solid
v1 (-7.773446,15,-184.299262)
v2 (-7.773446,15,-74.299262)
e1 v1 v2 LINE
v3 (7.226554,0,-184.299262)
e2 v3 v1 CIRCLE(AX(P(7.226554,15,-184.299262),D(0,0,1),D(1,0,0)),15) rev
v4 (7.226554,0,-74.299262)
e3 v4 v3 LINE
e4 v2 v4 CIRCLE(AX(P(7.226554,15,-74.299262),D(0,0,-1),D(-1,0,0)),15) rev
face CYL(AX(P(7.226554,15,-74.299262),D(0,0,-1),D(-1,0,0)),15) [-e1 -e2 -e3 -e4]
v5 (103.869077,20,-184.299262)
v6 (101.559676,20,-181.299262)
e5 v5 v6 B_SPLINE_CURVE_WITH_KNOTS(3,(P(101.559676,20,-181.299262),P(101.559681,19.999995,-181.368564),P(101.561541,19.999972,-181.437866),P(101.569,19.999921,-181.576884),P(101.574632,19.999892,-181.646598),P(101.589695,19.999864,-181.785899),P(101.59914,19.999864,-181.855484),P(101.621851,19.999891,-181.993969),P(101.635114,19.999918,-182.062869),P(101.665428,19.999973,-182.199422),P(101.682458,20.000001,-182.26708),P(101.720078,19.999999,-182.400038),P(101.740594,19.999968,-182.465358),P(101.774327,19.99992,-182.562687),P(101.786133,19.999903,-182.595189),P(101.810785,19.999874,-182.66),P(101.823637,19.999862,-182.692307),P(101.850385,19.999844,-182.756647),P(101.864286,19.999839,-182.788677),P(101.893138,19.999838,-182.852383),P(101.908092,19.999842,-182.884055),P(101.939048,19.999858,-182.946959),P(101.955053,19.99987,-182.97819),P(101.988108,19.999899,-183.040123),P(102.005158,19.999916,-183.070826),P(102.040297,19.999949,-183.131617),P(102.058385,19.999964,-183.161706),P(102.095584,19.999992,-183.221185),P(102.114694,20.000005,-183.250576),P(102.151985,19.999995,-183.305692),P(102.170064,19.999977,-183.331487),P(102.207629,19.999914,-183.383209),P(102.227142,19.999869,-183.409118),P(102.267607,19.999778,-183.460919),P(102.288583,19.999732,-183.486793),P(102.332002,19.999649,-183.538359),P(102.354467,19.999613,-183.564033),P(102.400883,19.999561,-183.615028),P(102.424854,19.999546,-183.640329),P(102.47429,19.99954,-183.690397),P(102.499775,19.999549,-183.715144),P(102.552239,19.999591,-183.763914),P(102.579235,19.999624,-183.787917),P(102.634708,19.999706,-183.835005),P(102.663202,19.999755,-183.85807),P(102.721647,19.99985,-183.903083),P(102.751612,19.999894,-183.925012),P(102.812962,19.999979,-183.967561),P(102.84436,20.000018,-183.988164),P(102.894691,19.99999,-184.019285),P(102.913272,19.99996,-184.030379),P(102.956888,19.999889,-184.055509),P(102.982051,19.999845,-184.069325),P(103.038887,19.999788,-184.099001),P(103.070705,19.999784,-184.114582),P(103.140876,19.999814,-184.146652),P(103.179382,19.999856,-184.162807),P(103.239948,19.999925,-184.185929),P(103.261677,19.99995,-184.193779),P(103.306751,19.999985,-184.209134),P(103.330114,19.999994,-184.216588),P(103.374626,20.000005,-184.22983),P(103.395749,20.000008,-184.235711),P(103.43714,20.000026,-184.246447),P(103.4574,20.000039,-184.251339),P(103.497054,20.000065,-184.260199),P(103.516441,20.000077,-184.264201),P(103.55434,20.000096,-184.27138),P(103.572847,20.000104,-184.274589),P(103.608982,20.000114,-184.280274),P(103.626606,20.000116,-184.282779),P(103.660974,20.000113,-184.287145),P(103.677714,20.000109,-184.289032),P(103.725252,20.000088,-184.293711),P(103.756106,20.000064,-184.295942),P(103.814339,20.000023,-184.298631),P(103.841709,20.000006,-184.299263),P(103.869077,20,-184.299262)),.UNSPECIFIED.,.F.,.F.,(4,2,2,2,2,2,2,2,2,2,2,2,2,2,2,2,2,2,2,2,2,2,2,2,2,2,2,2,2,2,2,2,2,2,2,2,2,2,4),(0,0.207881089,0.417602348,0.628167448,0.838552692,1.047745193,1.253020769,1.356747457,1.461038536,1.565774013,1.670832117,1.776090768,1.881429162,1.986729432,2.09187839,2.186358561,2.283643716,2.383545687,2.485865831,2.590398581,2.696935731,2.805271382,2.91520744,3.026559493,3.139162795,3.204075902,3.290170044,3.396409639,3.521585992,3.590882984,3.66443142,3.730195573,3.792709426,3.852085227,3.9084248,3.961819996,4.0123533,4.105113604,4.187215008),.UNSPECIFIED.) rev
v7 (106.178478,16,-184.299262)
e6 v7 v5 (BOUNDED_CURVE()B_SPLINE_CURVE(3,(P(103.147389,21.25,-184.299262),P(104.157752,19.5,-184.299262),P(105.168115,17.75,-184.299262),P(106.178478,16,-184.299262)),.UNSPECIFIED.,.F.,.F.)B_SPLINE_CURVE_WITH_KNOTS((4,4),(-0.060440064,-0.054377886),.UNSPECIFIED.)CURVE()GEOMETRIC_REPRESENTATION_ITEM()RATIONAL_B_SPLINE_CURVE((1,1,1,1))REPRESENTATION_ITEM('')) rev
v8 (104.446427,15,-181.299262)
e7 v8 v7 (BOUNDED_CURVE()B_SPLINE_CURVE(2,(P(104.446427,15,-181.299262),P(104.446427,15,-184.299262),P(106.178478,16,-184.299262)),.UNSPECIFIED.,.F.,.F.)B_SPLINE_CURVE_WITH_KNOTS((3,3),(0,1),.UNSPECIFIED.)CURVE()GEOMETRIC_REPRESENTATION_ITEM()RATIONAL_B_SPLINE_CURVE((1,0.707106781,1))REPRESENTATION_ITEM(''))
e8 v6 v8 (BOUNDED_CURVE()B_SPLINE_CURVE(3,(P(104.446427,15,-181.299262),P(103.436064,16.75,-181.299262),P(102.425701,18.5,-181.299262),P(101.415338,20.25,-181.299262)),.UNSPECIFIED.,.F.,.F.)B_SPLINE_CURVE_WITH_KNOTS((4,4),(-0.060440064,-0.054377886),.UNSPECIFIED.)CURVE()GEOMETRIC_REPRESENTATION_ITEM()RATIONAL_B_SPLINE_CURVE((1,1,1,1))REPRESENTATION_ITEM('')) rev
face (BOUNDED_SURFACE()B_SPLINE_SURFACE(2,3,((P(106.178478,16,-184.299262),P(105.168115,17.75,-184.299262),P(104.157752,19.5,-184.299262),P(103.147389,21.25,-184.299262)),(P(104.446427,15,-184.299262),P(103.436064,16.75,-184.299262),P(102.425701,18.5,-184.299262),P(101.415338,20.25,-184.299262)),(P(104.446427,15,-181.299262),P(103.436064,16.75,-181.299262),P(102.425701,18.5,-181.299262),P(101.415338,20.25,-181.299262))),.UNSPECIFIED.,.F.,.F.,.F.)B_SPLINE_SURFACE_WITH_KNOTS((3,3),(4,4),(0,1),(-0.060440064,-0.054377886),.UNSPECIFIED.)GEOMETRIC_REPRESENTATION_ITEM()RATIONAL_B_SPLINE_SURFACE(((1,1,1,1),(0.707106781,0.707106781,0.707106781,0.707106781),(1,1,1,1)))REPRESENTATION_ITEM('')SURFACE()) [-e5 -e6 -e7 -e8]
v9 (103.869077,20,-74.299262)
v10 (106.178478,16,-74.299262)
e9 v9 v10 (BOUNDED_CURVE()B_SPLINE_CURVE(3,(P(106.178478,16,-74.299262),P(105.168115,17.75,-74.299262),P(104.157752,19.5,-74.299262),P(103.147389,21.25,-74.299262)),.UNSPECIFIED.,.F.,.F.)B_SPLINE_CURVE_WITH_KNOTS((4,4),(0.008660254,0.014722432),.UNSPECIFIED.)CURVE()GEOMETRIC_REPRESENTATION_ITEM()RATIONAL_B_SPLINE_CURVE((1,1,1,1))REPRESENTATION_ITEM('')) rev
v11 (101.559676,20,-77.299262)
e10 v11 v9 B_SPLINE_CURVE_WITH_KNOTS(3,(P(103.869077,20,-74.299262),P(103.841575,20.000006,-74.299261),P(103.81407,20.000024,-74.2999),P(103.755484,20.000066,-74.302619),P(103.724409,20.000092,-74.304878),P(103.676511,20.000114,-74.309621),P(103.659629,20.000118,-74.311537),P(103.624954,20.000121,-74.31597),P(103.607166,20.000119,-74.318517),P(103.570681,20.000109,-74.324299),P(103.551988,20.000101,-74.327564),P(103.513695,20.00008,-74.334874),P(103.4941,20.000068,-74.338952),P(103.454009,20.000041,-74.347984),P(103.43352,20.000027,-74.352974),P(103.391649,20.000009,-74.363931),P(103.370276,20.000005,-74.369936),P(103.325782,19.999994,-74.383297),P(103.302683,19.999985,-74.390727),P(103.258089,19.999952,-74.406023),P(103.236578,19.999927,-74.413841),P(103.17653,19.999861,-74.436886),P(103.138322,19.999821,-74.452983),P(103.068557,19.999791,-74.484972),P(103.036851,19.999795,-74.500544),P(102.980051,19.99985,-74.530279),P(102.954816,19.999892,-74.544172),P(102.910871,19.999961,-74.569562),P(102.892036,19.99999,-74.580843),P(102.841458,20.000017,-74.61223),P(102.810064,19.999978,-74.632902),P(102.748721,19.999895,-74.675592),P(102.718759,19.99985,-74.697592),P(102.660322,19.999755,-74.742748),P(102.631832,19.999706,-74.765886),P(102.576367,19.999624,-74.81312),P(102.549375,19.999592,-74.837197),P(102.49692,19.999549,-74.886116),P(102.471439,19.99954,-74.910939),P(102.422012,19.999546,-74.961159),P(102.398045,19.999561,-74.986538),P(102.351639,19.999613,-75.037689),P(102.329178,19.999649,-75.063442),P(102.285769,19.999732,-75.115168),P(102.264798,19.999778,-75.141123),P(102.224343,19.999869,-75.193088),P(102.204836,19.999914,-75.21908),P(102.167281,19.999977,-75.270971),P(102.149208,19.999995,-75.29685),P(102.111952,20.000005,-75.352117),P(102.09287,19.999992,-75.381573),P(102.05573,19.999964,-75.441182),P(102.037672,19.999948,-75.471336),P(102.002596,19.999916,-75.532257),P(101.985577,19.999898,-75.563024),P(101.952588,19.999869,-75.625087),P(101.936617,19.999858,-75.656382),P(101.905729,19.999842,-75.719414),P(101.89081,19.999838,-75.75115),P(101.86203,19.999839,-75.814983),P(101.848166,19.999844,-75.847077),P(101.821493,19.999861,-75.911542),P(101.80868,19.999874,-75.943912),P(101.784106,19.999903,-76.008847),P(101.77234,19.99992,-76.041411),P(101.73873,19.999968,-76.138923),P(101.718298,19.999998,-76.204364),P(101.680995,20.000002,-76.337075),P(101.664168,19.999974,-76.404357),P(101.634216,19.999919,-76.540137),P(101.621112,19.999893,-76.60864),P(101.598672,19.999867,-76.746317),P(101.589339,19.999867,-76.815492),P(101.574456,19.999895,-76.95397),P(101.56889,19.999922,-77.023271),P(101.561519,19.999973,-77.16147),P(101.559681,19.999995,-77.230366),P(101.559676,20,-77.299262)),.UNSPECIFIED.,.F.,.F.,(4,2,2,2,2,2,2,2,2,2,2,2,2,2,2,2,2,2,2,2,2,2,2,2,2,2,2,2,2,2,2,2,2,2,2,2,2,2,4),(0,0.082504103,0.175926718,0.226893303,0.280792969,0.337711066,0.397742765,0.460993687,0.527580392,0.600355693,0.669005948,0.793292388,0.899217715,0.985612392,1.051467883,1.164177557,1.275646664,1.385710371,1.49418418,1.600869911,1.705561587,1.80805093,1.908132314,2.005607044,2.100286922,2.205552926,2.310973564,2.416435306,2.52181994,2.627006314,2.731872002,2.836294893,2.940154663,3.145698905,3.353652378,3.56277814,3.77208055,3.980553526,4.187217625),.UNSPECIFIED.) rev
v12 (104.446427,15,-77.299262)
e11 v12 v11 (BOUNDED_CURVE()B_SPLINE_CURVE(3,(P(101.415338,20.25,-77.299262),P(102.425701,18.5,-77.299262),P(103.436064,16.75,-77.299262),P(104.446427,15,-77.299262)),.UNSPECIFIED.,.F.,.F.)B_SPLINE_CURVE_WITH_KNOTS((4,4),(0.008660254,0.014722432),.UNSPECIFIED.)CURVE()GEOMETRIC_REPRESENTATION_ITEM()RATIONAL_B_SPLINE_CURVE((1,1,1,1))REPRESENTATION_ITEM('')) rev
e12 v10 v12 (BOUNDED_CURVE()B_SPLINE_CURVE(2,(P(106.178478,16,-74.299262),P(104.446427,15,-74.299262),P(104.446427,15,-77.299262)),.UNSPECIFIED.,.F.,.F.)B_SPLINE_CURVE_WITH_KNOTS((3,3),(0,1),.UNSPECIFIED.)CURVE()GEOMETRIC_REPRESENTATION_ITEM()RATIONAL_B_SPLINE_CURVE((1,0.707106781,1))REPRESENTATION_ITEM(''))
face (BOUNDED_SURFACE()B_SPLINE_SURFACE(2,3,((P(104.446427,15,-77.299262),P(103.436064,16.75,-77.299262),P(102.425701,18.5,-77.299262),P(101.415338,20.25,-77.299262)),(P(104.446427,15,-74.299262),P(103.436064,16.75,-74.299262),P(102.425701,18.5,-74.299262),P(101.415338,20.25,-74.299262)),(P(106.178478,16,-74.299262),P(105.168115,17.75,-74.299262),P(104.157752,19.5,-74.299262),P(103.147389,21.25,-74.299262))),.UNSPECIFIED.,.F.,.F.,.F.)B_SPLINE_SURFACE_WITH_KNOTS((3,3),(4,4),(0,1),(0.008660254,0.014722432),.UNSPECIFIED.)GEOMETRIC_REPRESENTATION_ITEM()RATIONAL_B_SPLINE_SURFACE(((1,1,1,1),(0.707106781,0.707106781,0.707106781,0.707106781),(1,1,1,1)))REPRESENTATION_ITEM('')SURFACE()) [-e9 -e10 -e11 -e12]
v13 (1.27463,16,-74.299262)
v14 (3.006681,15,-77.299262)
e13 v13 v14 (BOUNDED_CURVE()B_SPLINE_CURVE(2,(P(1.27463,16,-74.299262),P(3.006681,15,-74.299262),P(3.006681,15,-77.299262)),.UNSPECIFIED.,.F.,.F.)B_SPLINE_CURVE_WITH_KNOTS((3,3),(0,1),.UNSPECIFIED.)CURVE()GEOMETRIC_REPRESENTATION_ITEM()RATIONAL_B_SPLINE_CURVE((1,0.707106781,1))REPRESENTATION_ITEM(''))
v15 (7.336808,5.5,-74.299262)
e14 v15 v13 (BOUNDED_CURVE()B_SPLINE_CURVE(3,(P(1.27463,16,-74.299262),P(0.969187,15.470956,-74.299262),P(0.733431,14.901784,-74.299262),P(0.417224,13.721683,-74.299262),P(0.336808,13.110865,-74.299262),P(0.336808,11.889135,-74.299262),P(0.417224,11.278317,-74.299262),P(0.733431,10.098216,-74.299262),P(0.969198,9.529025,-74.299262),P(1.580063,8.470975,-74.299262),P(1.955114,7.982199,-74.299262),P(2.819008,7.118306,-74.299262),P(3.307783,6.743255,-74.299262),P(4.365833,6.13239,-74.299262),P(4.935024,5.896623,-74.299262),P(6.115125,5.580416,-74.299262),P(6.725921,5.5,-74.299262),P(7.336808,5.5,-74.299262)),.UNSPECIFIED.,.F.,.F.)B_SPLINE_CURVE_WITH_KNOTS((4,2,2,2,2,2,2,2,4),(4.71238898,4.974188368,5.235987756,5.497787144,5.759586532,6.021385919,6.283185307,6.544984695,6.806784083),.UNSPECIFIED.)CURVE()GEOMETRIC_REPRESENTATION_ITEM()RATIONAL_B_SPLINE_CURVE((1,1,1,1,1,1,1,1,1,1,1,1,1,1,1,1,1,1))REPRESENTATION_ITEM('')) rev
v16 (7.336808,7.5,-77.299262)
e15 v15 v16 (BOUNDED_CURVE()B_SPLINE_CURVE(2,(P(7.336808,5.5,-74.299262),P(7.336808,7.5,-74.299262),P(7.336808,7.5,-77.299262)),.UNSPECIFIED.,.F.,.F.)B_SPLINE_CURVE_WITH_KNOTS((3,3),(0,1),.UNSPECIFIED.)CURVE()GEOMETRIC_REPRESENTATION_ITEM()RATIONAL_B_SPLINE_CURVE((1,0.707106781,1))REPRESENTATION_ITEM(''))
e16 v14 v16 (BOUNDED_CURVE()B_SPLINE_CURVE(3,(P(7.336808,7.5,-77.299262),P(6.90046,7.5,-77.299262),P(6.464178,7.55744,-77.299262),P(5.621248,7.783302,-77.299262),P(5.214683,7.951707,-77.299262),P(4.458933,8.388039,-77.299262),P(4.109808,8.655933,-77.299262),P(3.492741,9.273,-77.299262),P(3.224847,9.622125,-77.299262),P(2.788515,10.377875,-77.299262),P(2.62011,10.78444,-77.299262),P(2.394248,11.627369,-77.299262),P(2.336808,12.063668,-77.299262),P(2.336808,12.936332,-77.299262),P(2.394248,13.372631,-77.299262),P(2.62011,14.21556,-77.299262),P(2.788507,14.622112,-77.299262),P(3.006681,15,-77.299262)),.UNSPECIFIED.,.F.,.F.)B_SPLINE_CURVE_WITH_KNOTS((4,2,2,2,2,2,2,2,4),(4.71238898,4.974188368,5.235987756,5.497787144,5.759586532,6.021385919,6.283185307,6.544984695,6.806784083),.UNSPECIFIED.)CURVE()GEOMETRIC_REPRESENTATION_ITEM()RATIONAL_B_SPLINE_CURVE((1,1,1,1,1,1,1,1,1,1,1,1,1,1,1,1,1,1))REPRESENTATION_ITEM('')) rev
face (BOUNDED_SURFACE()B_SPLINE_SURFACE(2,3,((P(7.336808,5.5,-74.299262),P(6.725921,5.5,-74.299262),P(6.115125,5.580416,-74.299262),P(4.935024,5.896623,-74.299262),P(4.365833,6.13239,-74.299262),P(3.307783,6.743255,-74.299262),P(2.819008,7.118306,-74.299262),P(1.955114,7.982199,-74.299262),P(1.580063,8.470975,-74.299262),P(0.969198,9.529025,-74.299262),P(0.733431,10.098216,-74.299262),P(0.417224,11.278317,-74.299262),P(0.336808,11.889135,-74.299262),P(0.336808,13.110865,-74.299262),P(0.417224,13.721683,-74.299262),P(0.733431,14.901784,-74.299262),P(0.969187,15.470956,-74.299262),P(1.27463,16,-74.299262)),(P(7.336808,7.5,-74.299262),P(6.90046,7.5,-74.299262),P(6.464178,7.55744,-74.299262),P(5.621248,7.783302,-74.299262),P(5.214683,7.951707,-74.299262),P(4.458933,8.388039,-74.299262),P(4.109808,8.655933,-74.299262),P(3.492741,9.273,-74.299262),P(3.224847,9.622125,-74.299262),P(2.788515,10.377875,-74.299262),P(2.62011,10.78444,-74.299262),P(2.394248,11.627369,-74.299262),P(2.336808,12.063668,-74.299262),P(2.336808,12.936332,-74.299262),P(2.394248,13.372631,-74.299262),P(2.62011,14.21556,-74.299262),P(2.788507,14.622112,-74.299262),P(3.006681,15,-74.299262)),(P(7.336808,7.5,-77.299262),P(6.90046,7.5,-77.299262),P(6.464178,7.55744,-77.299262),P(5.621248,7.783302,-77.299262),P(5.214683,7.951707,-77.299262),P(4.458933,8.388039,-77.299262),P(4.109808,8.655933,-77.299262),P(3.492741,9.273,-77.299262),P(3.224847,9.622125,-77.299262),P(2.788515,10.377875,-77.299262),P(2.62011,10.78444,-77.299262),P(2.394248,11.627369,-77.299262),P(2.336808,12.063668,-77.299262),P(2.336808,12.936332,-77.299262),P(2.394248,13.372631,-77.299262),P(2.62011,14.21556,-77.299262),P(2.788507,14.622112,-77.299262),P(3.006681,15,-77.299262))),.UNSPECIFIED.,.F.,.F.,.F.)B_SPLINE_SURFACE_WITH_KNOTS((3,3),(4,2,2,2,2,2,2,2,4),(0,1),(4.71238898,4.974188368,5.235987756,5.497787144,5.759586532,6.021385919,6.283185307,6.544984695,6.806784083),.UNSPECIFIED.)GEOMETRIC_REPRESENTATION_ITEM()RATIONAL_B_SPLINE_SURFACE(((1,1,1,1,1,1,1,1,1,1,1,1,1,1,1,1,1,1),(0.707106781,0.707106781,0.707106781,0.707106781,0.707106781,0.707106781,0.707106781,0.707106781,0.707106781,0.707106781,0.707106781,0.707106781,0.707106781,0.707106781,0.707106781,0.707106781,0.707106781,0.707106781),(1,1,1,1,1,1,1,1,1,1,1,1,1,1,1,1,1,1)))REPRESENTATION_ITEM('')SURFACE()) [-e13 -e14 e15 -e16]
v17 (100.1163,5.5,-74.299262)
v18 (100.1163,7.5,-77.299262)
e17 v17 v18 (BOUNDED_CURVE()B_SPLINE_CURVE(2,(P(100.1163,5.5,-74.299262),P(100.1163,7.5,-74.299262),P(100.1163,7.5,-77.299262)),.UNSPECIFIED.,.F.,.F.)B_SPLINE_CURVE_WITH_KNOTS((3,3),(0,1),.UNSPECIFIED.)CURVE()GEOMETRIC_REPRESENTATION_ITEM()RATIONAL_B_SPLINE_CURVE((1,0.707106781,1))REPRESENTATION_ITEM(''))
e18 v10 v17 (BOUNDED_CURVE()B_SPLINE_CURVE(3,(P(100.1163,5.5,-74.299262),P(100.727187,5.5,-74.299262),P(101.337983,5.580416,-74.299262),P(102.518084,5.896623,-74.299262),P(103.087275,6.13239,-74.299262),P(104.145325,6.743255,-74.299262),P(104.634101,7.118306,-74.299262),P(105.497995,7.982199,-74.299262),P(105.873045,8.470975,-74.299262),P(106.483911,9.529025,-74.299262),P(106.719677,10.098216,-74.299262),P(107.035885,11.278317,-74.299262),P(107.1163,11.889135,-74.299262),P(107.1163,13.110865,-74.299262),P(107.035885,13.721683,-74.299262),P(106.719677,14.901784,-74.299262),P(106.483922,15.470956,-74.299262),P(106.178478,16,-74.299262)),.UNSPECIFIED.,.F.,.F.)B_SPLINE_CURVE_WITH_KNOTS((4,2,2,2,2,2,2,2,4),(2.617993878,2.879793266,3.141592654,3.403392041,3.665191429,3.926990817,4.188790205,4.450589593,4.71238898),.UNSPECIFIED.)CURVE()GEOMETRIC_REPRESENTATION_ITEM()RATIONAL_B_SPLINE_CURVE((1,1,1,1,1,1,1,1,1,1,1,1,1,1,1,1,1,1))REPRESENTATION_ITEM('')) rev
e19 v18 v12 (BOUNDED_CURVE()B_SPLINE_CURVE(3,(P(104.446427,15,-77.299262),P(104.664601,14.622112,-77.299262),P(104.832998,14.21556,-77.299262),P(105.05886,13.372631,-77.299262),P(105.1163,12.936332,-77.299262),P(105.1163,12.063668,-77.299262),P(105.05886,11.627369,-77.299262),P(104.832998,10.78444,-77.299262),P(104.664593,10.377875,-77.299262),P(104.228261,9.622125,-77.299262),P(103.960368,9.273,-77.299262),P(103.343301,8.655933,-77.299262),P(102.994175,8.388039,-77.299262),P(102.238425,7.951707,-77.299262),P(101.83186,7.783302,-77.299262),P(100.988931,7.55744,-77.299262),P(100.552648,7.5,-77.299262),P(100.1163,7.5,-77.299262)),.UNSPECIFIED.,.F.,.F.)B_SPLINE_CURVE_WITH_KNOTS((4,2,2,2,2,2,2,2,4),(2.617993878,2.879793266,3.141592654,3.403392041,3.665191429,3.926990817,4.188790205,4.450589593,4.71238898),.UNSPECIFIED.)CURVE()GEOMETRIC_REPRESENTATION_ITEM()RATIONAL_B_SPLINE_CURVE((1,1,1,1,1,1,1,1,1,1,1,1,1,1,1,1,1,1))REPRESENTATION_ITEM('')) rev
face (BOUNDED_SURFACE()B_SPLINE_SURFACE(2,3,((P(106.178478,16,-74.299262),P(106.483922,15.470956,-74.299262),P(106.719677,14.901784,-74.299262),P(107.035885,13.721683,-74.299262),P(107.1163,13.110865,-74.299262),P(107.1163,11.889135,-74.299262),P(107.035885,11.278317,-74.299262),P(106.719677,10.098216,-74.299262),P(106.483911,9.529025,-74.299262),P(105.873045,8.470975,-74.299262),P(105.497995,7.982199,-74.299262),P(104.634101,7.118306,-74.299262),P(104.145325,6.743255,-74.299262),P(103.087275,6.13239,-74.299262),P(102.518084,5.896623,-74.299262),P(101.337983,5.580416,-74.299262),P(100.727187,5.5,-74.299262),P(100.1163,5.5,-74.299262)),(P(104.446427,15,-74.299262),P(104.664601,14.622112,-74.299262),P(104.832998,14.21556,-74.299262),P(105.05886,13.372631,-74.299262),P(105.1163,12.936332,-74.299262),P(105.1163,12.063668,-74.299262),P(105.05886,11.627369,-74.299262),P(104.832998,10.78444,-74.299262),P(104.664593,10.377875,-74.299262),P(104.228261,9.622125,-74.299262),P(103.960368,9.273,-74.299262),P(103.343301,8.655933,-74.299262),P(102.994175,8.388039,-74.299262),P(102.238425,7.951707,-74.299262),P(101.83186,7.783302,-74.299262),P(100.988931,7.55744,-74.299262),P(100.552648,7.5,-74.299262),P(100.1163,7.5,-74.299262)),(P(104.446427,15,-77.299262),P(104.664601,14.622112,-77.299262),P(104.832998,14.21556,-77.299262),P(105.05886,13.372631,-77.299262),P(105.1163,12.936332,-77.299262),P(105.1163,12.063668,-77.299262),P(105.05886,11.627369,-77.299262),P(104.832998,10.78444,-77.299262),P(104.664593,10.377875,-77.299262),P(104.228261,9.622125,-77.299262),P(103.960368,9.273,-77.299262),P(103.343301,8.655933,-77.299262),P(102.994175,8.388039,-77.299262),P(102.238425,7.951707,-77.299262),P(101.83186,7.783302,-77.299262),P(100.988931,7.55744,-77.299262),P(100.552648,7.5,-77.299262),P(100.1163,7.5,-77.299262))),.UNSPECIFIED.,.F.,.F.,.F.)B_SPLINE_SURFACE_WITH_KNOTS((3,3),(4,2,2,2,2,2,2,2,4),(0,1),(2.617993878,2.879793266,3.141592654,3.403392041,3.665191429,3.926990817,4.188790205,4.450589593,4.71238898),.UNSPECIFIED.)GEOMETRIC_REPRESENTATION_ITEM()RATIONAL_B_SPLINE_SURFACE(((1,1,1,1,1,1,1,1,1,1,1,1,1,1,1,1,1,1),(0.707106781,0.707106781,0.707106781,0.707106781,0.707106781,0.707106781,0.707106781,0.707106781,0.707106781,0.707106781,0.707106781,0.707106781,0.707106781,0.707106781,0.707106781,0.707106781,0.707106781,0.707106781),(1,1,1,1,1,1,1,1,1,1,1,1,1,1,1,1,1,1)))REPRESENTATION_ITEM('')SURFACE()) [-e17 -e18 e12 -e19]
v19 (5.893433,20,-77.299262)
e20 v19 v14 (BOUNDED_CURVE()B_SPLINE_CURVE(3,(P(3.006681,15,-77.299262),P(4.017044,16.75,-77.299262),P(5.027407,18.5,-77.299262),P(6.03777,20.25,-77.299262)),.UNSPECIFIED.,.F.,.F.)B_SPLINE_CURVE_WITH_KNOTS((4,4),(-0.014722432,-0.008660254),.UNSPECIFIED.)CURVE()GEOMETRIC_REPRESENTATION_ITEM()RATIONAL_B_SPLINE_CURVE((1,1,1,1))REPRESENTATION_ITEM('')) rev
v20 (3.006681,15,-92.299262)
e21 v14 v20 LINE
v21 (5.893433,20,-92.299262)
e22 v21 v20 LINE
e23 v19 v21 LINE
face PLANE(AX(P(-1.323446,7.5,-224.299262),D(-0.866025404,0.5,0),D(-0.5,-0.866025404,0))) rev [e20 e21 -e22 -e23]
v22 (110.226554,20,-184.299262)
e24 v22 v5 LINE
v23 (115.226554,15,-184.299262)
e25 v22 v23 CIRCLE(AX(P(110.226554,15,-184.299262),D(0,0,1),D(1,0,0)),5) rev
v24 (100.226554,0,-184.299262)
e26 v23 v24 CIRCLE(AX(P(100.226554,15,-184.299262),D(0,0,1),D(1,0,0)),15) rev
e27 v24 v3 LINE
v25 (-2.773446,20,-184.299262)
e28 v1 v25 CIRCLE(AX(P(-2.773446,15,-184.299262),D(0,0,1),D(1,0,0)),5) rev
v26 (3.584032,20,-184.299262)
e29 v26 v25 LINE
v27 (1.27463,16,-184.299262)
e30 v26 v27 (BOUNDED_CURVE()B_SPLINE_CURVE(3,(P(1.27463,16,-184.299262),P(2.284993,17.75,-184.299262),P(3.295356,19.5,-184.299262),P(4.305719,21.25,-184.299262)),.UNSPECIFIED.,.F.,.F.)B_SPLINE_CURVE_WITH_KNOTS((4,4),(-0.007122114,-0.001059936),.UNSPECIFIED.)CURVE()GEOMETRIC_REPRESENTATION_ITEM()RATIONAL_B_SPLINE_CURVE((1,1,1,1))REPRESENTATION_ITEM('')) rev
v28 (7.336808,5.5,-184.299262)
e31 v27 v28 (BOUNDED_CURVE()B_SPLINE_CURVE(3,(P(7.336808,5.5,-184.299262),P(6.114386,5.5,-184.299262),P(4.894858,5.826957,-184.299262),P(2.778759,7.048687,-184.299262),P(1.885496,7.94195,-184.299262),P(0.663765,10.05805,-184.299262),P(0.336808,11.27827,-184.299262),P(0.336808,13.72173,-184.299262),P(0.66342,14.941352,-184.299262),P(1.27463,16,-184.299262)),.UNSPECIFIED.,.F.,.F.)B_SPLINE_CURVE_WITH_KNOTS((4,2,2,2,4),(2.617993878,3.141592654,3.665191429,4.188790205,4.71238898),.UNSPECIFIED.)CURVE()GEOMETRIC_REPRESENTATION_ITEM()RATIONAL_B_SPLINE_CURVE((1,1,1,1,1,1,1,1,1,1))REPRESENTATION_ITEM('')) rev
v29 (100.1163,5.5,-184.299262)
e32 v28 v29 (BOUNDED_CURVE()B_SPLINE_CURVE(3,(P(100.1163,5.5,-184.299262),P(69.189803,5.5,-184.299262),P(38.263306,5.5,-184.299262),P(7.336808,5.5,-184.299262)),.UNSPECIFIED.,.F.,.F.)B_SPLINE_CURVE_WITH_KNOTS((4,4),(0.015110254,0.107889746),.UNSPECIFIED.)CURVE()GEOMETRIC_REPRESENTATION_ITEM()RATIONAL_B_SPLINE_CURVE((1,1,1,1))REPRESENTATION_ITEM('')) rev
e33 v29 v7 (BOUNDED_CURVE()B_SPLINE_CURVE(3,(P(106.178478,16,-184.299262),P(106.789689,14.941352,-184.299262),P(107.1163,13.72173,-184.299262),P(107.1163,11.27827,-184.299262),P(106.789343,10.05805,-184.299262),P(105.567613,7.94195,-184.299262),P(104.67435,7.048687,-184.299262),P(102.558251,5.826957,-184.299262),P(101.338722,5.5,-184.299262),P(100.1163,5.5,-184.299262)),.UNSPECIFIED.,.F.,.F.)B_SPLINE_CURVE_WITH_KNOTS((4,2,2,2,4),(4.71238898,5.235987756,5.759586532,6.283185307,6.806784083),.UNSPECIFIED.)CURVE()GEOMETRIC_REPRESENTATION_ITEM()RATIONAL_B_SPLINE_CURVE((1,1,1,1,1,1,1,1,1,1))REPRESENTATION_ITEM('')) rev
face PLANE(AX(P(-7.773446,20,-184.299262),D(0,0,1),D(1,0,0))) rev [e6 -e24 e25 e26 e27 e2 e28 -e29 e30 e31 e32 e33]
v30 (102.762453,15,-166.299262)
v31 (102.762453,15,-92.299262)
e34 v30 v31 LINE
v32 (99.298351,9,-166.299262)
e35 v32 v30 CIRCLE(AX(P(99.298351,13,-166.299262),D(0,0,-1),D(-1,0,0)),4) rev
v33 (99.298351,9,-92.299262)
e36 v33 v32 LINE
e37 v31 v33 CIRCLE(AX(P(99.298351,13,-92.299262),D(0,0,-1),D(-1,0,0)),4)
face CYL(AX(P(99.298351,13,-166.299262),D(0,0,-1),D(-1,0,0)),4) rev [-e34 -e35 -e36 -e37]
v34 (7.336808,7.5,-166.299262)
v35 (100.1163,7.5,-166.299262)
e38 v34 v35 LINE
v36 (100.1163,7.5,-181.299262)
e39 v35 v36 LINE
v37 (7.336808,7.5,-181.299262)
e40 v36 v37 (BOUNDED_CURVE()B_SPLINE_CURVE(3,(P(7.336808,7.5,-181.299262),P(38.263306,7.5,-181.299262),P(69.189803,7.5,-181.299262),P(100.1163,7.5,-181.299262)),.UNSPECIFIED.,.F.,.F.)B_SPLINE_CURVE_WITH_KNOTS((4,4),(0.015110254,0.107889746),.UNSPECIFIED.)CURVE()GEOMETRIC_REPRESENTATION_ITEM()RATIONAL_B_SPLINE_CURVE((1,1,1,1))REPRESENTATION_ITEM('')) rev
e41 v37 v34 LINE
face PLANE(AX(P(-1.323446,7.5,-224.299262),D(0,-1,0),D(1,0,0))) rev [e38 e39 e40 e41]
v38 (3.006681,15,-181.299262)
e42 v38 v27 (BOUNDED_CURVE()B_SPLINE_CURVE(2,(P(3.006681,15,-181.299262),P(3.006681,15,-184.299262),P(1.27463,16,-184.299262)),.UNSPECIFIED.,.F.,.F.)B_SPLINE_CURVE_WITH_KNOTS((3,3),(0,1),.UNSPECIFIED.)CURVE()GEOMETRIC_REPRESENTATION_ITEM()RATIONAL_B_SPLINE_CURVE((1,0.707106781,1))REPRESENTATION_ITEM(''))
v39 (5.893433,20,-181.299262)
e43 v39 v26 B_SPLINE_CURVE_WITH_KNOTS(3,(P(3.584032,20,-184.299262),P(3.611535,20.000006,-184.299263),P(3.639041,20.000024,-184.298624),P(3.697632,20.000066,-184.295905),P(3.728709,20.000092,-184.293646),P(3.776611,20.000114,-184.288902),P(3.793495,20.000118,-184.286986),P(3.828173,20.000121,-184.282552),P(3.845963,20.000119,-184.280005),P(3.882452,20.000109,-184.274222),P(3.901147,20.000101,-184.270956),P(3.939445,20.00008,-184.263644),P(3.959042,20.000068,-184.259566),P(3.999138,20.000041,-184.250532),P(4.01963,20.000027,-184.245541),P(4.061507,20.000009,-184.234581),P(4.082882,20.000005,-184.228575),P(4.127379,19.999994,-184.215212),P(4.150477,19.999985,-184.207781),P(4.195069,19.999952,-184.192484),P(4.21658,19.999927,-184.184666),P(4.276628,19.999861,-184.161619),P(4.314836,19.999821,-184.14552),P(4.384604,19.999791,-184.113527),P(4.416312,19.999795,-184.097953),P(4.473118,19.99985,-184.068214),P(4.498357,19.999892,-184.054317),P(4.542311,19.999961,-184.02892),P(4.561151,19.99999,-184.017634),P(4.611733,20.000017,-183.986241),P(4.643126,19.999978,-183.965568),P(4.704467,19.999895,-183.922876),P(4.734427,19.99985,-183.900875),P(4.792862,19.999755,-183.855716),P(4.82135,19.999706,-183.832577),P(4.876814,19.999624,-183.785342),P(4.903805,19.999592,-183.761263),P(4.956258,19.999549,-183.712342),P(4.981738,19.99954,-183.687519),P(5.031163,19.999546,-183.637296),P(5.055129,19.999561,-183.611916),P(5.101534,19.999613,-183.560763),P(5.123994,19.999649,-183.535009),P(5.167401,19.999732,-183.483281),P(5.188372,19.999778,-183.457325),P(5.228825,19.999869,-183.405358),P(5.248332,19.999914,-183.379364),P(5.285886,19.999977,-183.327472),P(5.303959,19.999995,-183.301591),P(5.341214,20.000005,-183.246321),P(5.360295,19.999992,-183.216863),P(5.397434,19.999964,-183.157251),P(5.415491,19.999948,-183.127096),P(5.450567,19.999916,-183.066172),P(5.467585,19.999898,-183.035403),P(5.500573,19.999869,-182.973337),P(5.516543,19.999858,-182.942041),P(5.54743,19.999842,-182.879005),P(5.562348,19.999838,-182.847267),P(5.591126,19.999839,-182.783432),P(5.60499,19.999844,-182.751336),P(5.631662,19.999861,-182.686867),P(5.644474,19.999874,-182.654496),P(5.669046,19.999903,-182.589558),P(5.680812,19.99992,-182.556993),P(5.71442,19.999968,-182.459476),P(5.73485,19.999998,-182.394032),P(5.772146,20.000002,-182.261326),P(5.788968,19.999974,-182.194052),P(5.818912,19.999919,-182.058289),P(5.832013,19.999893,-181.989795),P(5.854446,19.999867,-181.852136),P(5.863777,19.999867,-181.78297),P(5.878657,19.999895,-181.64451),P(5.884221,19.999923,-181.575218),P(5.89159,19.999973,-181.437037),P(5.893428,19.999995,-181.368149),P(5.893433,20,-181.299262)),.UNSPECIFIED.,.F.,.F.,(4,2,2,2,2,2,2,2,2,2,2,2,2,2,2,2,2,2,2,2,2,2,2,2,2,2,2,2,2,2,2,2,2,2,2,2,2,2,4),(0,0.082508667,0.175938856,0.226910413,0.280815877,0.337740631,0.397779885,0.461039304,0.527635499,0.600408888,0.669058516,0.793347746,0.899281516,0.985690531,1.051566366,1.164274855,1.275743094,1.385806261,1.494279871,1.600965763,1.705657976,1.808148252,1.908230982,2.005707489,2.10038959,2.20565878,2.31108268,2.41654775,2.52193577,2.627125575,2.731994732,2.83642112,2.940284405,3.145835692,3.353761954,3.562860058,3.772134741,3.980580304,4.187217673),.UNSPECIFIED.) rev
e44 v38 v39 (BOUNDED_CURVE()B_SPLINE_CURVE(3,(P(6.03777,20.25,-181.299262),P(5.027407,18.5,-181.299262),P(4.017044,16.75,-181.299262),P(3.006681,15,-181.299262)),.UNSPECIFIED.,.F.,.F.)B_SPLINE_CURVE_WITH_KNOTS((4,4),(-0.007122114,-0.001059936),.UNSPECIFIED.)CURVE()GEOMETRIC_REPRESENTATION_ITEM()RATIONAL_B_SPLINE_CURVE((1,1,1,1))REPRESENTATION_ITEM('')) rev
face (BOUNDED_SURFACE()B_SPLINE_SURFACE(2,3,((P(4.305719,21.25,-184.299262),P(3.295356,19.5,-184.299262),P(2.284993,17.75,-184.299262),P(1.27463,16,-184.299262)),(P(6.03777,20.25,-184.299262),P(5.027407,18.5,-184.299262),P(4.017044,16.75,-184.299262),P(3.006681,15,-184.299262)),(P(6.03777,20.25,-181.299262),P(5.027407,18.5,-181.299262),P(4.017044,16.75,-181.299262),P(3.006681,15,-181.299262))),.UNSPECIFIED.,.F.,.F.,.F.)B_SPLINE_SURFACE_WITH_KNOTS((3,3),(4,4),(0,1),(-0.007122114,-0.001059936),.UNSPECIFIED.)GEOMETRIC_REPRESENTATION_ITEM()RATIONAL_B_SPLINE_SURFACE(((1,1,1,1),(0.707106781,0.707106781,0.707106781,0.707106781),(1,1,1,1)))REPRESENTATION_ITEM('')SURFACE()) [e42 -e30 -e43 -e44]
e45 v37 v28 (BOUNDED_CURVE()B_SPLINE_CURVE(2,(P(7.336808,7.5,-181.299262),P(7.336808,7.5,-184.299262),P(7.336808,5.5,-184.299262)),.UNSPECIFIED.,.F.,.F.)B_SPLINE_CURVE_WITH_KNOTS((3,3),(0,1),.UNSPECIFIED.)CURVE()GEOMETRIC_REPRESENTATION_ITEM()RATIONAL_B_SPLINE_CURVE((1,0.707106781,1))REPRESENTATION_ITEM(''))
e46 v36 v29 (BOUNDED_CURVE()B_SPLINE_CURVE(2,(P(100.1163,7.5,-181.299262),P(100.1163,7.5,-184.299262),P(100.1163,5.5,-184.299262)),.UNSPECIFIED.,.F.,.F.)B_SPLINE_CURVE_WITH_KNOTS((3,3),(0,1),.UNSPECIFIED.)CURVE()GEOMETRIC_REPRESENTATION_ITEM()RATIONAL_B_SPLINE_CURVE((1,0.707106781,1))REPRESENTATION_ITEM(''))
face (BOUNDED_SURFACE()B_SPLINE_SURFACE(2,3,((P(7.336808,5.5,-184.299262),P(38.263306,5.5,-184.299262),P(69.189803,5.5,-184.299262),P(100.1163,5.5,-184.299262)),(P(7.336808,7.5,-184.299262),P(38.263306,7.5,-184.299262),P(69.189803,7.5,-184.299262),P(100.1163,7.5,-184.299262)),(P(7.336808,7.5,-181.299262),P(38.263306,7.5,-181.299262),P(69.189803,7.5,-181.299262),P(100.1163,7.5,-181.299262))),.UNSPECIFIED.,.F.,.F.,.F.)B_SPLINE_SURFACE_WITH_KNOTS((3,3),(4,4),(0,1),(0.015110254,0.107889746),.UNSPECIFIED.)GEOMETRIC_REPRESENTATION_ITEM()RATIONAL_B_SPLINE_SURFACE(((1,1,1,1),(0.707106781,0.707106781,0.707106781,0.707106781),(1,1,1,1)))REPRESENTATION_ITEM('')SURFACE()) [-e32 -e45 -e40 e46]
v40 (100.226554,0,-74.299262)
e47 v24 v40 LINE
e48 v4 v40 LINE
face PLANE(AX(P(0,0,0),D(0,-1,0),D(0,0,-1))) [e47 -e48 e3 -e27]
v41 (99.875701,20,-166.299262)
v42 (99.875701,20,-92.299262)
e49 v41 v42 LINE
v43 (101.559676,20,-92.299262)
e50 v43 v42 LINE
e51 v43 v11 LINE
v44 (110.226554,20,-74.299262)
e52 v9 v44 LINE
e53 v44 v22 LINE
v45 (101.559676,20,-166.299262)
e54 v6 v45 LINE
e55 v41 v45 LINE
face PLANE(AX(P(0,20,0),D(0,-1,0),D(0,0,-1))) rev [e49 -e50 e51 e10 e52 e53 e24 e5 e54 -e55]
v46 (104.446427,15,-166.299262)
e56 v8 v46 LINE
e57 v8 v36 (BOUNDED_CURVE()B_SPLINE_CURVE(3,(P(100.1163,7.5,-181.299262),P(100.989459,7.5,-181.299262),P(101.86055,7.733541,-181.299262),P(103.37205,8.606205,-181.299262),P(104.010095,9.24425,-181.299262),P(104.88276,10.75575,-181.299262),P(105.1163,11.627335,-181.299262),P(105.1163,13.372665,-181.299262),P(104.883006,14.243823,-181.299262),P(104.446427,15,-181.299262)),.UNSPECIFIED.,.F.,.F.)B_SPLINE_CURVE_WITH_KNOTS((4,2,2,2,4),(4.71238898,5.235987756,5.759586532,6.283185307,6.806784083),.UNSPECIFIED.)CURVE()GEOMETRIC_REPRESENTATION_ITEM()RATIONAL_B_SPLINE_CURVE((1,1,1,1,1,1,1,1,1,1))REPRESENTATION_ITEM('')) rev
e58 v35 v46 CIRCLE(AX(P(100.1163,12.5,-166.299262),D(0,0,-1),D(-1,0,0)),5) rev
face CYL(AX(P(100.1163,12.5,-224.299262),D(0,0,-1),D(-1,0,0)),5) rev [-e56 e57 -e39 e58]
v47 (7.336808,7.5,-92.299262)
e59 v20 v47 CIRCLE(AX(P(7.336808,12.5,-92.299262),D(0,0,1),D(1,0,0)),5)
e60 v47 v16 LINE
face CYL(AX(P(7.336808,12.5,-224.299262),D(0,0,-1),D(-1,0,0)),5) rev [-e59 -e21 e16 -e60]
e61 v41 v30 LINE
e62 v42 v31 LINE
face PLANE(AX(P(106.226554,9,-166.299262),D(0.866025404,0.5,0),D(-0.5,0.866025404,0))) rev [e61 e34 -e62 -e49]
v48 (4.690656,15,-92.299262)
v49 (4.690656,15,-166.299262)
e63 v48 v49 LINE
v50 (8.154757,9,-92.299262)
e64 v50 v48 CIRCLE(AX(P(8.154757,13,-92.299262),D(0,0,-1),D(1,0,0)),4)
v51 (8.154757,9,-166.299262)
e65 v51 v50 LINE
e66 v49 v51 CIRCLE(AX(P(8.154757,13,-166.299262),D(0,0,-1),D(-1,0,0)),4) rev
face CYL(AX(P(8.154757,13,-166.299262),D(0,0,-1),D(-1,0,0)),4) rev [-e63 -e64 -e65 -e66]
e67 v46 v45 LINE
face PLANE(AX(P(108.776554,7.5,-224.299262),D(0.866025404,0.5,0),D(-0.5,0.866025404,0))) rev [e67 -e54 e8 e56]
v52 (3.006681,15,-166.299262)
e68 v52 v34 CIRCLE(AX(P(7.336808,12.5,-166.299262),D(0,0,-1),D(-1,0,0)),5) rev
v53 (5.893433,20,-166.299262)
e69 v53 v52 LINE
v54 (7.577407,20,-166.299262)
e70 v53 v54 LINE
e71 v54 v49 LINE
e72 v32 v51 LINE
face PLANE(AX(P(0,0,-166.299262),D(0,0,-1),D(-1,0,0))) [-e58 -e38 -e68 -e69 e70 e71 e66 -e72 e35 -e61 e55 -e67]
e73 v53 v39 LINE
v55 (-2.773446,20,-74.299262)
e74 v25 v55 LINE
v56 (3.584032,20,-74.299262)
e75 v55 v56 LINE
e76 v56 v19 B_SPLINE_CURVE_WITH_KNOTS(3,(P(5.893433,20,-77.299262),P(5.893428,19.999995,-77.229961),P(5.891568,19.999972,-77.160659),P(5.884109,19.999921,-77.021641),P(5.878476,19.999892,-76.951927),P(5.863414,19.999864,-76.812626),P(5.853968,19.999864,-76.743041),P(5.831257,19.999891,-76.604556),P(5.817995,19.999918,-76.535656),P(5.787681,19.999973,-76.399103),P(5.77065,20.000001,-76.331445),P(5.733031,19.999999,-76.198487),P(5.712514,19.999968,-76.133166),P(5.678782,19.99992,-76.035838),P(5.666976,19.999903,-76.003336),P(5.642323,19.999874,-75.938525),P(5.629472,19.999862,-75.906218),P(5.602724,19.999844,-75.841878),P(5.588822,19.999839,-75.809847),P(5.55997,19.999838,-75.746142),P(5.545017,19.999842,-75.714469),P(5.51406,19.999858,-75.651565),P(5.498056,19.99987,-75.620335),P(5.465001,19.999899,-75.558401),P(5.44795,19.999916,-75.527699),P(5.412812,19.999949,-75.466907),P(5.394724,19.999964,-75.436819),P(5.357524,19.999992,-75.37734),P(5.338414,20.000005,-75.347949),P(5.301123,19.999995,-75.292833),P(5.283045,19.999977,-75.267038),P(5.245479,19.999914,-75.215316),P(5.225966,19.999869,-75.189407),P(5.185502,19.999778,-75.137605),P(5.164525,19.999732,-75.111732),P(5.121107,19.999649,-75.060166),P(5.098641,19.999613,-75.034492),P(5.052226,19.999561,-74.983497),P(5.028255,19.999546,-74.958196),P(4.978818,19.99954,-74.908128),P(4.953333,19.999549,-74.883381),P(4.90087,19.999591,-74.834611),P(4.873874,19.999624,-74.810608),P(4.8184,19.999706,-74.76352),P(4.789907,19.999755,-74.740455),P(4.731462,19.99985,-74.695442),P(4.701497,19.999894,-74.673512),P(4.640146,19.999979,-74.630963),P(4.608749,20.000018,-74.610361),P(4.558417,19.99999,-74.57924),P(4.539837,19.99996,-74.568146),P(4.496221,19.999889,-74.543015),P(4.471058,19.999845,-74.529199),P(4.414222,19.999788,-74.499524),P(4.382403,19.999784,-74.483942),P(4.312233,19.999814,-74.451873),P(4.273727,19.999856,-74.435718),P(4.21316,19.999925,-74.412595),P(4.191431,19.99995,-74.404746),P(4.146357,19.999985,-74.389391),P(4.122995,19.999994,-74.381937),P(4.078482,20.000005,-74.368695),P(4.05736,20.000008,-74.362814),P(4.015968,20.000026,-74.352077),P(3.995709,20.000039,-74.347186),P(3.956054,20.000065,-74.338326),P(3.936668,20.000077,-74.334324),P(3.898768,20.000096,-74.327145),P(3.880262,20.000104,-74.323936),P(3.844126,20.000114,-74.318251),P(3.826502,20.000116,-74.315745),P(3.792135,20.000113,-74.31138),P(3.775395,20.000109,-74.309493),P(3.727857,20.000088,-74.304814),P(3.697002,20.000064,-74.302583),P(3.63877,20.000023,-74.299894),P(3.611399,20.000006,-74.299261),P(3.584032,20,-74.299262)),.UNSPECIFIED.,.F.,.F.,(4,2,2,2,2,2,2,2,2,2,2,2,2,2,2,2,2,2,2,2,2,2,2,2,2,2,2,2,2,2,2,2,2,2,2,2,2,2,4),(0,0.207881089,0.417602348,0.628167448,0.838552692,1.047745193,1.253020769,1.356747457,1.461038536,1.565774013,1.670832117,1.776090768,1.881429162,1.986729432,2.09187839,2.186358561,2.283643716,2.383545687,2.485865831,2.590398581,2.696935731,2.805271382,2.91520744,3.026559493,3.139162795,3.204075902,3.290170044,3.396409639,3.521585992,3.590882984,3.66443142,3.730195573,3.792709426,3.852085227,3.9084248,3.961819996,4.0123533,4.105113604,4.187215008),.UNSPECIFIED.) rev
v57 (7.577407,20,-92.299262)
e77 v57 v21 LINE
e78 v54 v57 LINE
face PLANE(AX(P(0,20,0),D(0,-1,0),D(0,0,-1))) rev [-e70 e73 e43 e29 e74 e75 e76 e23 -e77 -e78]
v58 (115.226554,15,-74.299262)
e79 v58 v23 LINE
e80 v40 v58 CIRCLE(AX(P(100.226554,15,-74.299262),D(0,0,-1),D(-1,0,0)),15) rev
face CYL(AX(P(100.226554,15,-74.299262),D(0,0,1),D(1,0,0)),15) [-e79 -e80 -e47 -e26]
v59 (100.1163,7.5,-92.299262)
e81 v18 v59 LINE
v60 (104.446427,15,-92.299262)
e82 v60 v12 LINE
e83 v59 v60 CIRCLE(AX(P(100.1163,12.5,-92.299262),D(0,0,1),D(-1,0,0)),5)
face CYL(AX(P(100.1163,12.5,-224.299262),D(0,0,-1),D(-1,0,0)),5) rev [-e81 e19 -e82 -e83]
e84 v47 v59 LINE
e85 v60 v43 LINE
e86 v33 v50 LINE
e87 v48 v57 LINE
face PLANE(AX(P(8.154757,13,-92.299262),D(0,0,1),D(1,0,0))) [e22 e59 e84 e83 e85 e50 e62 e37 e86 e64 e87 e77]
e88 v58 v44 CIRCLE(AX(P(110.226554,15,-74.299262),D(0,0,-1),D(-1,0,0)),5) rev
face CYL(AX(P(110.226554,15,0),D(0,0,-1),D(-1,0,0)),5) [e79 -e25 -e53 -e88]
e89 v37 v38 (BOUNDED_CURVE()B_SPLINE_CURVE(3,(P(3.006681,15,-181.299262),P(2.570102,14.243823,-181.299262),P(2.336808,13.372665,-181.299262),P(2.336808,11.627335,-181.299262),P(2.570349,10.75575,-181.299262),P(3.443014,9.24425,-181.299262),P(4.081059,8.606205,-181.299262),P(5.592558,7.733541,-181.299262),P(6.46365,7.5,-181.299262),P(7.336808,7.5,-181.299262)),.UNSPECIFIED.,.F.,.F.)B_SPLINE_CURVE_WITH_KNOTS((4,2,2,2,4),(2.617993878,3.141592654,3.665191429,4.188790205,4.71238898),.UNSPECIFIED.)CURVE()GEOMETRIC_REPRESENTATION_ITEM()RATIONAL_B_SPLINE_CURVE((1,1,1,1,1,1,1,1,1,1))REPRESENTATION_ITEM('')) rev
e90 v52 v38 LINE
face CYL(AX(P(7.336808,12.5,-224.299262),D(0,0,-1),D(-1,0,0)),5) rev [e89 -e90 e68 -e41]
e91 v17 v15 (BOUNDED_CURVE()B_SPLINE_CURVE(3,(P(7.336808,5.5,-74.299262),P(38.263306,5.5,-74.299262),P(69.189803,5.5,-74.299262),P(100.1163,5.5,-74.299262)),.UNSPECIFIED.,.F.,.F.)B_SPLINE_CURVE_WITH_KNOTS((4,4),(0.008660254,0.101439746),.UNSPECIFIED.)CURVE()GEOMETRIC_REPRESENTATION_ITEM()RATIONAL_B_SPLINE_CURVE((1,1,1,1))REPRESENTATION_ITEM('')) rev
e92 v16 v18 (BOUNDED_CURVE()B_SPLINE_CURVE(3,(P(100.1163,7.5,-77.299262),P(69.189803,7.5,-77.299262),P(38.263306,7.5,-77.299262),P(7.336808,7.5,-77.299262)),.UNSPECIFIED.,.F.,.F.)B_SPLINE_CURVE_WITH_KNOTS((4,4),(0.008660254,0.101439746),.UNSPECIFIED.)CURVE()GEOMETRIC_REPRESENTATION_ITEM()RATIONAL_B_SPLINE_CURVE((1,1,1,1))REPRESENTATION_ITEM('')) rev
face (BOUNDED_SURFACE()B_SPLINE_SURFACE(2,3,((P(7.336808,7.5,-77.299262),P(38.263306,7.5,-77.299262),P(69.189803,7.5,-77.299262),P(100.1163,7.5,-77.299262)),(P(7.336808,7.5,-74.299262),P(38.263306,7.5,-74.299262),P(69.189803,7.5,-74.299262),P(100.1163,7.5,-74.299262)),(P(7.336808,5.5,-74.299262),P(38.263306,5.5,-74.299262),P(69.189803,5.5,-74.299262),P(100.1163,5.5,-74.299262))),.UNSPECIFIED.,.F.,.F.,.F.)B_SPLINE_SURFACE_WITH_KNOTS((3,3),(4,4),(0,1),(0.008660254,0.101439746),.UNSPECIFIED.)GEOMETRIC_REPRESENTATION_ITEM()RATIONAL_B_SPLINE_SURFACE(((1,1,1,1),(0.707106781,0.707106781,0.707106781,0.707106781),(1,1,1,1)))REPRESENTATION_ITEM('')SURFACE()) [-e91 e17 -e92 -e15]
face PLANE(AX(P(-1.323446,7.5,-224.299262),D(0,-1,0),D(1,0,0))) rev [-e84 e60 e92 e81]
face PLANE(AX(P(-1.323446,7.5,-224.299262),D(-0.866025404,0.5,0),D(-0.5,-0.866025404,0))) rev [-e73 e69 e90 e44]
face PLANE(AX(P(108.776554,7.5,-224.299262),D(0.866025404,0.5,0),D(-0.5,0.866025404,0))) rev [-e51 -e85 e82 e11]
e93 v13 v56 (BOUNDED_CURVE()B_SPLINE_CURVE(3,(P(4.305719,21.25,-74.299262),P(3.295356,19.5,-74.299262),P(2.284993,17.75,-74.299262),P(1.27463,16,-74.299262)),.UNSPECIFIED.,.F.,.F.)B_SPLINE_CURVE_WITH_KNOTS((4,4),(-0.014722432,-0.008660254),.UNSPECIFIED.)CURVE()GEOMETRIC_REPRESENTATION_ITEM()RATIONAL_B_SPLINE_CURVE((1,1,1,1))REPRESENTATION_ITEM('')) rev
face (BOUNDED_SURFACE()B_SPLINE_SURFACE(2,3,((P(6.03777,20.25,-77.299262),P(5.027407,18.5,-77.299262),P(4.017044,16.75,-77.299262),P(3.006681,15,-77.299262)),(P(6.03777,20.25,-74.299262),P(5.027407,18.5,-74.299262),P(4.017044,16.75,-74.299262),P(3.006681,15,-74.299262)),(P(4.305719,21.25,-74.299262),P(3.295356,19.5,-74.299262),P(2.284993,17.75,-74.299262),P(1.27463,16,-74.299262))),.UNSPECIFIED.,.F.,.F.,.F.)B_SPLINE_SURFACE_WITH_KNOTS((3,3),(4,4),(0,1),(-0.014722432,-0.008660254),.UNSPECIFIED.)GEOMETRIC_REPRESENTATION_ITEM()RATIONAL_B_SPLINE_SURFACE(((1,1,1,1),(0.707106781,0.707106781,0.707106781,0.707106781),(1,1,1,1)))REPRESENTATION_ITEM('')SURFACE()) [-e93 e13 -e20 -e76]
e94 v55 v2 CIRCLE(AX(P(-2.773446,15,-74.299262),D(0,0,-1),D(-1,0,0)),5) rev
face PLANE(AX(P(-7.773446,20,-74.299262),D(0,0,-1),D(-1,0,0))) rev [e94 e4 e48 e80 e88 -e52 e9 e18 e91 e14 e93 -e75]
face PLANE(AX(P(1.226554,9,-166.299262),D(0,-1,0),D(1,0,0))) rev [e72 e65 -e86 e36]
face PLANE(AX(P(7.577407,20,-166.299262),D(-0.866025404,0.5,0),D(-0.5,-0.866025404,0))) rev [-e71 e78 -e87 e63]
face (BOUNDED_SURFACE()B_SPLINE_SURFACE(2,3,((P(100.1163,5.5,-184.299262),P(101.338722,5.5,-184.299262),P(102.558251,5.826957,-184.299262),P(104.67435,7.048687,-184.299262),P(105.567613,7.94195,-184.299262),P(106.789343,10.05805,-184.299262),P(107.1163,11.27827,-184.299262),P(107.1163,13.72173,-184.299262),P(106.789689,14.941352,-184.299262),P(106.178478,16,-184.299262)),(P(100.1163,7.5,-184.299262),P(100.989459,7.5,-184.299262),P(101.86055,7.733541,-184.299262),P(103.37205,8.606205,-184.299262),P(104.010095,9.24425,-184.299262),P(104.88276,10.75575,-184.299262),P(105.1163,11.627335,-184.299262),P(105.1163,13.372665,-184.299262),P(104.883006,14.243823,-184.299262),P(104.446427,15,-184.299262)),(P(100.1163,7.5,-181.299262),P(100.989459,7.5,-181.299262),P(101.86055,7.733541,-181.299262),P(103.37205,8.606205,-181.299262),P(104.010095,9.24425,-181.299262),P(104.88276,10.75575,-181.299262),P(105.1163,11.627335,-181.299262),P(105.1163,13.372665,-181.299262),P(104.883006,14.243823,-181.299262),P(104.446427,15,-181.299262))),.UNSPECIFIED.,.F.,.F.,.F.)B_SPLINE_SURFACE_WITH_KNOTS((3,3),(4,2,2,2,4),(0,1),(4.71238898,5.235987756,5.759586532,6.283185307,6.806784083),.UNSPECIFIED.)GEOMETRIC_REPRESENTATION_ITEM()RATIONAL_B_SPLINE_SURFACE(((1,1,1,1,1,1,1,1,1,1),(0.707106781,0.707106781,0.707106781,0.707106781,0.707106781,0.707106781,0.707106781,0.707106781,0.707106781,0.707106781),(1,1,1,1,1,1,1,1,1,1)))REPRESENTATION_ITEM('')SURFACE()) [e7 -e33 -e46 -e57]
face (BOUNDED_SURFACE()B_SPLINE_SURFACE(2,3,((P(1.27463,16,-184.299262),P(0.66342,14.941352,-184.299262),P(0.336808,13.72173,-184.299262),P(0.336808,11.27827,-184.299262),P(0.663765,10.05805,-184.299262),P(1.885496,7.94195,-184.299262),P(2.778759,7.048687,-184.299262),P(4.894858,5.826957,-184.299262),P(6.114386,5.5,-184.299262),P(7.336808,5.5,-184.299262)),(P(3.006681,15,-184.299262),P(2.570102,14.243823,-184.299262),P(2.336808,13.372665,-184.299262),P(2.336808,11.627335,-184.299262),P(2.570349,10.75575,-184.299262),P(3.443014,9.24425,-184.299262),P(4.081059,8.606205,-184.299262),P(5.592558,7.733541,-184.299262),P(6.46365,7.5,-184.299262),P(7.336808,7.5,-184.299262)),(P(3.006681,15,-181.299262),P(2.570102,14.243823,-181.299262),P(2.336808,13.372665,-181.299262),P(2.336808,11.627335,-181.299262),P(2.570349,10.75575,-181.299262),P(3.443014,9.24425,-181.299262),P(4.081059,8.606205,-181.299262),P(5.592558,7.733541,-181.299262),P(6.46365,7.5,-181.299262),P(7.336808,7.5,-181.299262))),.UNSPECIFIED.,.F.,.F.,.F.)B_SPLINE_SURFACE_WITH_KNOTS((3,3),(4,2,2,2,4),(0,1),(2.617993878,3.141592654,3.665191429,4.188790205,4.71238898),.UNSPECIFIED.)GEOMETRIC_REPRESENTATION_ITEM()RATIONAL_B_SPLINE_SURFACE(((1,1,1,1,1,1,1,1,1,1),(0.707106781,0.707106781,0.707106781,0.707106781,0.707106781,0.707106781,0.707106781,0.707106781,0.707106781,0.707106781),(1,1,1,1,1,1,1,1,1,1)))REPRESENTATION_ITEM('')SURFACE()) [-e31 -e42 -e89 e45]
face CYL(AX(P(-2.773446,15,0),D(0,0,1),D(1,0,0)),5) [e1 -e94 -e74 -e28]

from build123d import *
from build123d.topology import SkipClean

# Parameters (mm, degrees)
SKETCH1_W           = 123
SKETCH1_H           = 110
BOSS_EXTRUDE1_DEPTH = 20
CUT_EXTRUDE3_DEPTH  = 150
FILLET2_R           = 5
FILLET5_R           = 15
FILLET6_SIZE        = 2
FILLET6_SIZE_2      = 3
FILLET7_SIZE        = 2
FILLET7_SIZE_2      = 3
FILLET8_R           = 5
BOSS_EXTRUDE3_START = -18
SKETCH6_W           = 113
SKETCH6_H           = 14.5
BOSS_EXTRUDE3_DEPTH = 64
CUT_EXTRUDE4_DEPTH  = 64
FILLET10_R          = 4
BOSS_EXTRUDE4_DEPTH = 10


# Some blends are built 0.0001 mm under size
with BuildPart() as part:
    # Sketch1 → Boss-Extrude1 (new body)
    with BuildSketch(Plane(origin=(0, 0, 0), x_dir=(1, 0, 0), z_dir=(0, 1, 0))):
        with Locations((53.726554268, 129.299262381)):
            Rectangle(SKETCH1_W, SKETCH1_H)
    extrude(amount=BOSS_EXTRUDE1_DEPTH)

    # Sketch5 → Cut-Extrude3 (cut)
    with BuildSketch(Plane.XY.offset(-74.299262381)):
        Polygon((5.893432633, 20), (101.559675903, 20), (108.776554268, 7.5), (-1.323445732, 7.5), align=None)
    extrude(amount=-CUT_EXTRUDE3_DEPTH, mode=Mode.SUBTRACT)

    # Fillet2
    fillet2_edges = [part.edges().sort_by_distance(p)[0] for p in [
        (108.776554268, 7.5, -129.299262381),
        (-1.323445732, 7.5, -129.299262381),
    ]]
    fillet(fillet2_edges, radius=FILLET2_R)

    # Fillet5
    fillet5_edges = [part.edges().sort_by_distance(p)[0] for p in [
        (115.226554268, 0, -129.299262381),
        (-7.773445732, 0, -129.299262381),
    ]]
    fillet(fillet5_edges, radius=FILLET5_R)

    # Fillet6
    # an asymmetric fillet: 3, 2 mm, written as the material it takes off along each edge
    with BuildSketch(Plane(origin=(3.006681287, 15, -74.299262381), x_dir=(-0.8660254037844386, 0.5000000000000001, 0), z_dir=(0.5000000000000001, 0.8660254037844387, 0)), Plane(origin=(97.809675903, 26.495190529, -74.299262381), x_dir=(0.8660254037844344, 0.5000000000000074, 0), z_dir=(0.5000000000000074, -0.8660254037844345, 0))) as fillet6_piece_1:
        with BuildLine():
            Bezier((FILLET6_SIZE, 0), (0, 0), (0, -FILLET6_SIZE_2), weights=[1, 0.707106781, 1])
            Line((0, -FILLET6_SIZE_2), (0, 0))
            Line((0, 0), (FILLET6_SIZE, 0))
        make_face()
    extrude(amount=13.273502692, mode=Mode.SUBTRACT)
    with BuildSketch(Plane(origin=(7.336808305, 12.5, -74.299262381), x_dir=(0, -1, 0), z_dir=(1, 0, 0))) as fillet6_piece_2:
        with BuildLine():
            Bezier((5 + FILLET6_SIZE, 0), (5, 0), (5, FILLET6_SIZE_2), weights=[1, 0.707106781, 1])
            Line((5, FILLET6_SIZE_2), (5, 0))
            Line((5, 0), (5 + FILLET6_SIZE, 0))
        make_face()
    revolve(axis=Axis((7.336808305, 12.5, -74.299262381), (0, 0, -1)), revolution_arc=120, mode=Mode.SUBTRACT)
    with BuildSketch(Plane(origin=(100.11630023, 12.5, -74.299262381), x_dir=(0.8660254037844343, 0.5000000000000077, 0), z_dir=(-0.5000000000000077, 0.8660254037844343, 0))) as fillet6_piece_3:
        with BuildLine():
            Bezier((5 + FILLET6_SIZE, 0), (5, 0), (5, FILLET6_SIZE_2), weights=[1, 0.707106781, 1])
            Line((5, FILLET6_SIZE_2), (5, 0))
            Line((5, 0), (5 + FILLET6_SIZE, 0))
        make_face()
    revolve(axis=Axis((100.11630023, 12.5, -74.299262381), (0, 0, -1)), revolution_arc=120, mode=Mode.SUBTRACT)
    with BuildSketch(Plane(origin=(100.11630023, 7.5, -74.299262381), x_dir=(0, -1, 0), z_dir=(-1, 0, 0))) as fillet6_piece_4:
        with BuildLine():
            Bezier((FILLET6_SIZE, 0), (0, 0), (0, -FILLET6_SIZE_2), weights=[1, 0.707106781, 1])
            Line((0, -FILLET6_SIZE_2), (0, 0))
            Line((0, 0), (FILLET6_SIZE, 0))
        make_face()
    extrude(amount=92.779491924, mode=Mode.SUBTRACT)

    # Fillet7
    # an asymmetric fillet: 3, 2 mm, written as the material it takes off along each edge
    with BuildSketch(Plane(origin=(3.006681287, 15, -184.299262381), x_dir=(-0.8660254037844386, 0.5000000000000001, 0), z_dir=(0.5000000000000001, 0.8660254037844387, 0)), Plane(origin=(97.809675903, 26.495190528, -184.299262381), x_dir=(0.8660254037844344, 0.5000000000000074, 0), z_dir=(0.5000000000000074, -0.8660254037844345, 0))) as fillet7_piece_1:
        with BuildLine():
            Bezier((FILLET7_SIZE, 0), (0, 0), (0, FILLET7_SIZE_2), weights=[1, 0.707106781, 1])
            Line((0, FILLET7_SIZE_2), (0, 0))
            Line((0, 0), (FILLET7_SIZE, 0))
        make_face()
    extrude(amount=13.273502692, mode=Mode.SUBTRACT)
    with BuildSketch(Plane(origin=(7.336808305, 12.5, -184.299262381), x_dir=(0, -1, 0), z_dir=(1, 0, 0))) as fillet7_piece_2:
        with BuildLine():
            Bezier((5 + FILLET7_SIZE, 0), (5, 0), (5, -FILLET7_SIZE_2), weights=[1, 0.707106781, 1])
            Line((5, -FILLET7_SIZE_2), (5, 0))
            Line((5, 0), (5 + FILLET7_SIZE, 0))
        make_face()
    revolve(axis=Axis((7.336808305, 12.5, -184.299262381), (0, 0, -1)), revolution_arc=120, mode=Mode.SUBTRACT)
    with BuildSketch(Plane(origin=(100.11630023, 12.5, -184.299262381), x_dir=(0.8660254037844343, 0.5000000000000077, 0), z_dir=(-0.5000000000000077, 0.8660254037844343, 0))) as fillet7_piece_3:
        with BuildLine():
            Bezier((5 + FILLET7_SIZE, 0), (5, 0), (5, -FILLET7_SIZE_2), weights=[1, 0.707106781, 1])
            Line((5, -FILLET7_SIZE_2), (5, 0))
            Line((5, 0), (5 + FILLET7_SIZE, 0))
        make_face()
    revolve(axis=Axis((100.11630023, 12.5, -184.299262381), (0, 0, -1)), revolution_arc=120, mode=Mode.SUBTRACT)
    with BuildSketch(Plane(origin=(100.11630023, 7.5, -184.299262381), x_dir=(0, -1, 0), z_dir=(-1, 0, 0))) as fillet7_piece_4:
        with BuildLine():
            Bezier((FILLET7_SIZE, 0), (0, 0), (0, FILLET7_SIZE_2), weights=[1, 0.707106781, 1])
            Line((0, FILLET7_SIZE_2), (0, 0))
            Line((0, 0), (FILLET7_SIZE, 0))
        make_face()
    extrude(amount=92.779491924, mode=Mode.SUBTRACT)

    # Fillet8
    fillet8_edges = [part.edges().sort_by_distance(p)[0] for p in [
        (-7.773445732, 20, -129.299262381),
        (115.226554268, 20, -129.299262381),
    ]]
    fillet(fillet8_edges, radius=FILLET8_R - 0.0001)  # a hair under: the kernel refuses the full size

    # Sketch6 → Boss-Extrude3 (add)
    with BuildSketch(Plane(origin=(0, 0, -184.299262381), x_dir=(-1, 0, 0), z_dir=(0, 0, -1)).offset(BOSS_EXTRUDE3_START)):
        with Locations((-53.726554268, 12.75)):
            Rectangle(SKETCH6_W, SKETCH6_H)
    extrude(amount=-BOSS_EXTRUDE3_DEPTH)

    # Sketch8 → Cut-Extrude4 (cut)
    with BuildSketch(Plane.XY.offset(-102.299262381)):
        Polygon((1.226554268, 9), (106.226554268, 9), (99.875701307, 20), (7.577407229, 20), align=None)
    extrude(amount=-CUT_EXTRUDE4_DEPTH, mode=Mode.SUBTRACT)

    # Fillet10
    # the kernel refuses this fillet: 4 mm, written as the material it adds along each edge
    with BuildSketch(Plane(origin=(1.226554268, 9, -102.299262381), x_dir=(0.5000000000000043, 0.8660254037844362, 0), z_dir=(0, 0, -1))) as fillet10_piece_1:
        with BuildLine():
            CenterArc((FILLET10_R * 1.73205080757, FILLET10_R), FILLET10_R, 150, 120)
            Line((FILLET10_R * 0.866025403784, FILLET10_R * 1.5), (0, 0))
            Line((0, 0), (FILLET10_R * 1.73205080757, 0))
        make_face()
    extrude(amount=64)
    with BuildSketch(Plane(origin=(106.226554268, 9, -102.299262381), x_dir=(-0.5000000000000053, 0.8660254037844355, 0), z_dir=(0, 0, -1))) as fillet10_piece_2:
        with BuildLine():
            CenterArc((FILLET10_R * 1.73205080757, -FILLET10_R), FILLET10_R, 90, 120)
            Line((FILLET10_R * 0.866025403784, -FILLET10_R * 1.5), (0, 0))
            Line((0, 0), (FILLET10_R * 1.73205080757, 0))
        make_face()
    extrude(amount=64)

    # Sketch9 → Boss-Extrude4 (add)
    with SkipClean():  # the faces are left unmerged after this step: merging them gives an invalid solid
        with BuildSketch(Plane.XY.offset(-102.299262381)):
            with BuildLine():
                Line((8.154757498, 9), (99.298351037, 9))
                ThreePointArc((99.298351037, 9), (102.762452653, 11), (102.762452653, 15))
                Line((102.762452653, 15), (99.875701307, 20))
                Line((99.875701307, 20), (101.559675903, 20))
                Line((101.559675903, 20), (104.446427249, 15))
                ThreePointArc((104.446427249, 15), (104.446427249, 10), (100.11630023, 7.5))
                Line((100.11630023, 7.5), (7.336808305, 7.5))
                ThreePointArc((7.336808305, 7.5), (3.014687704, 9.986183479), (2.990801035, 14.972290599))
                ThreePointArc((2.990801035, 14.972290599), (2.998719037, 14.986157979), (3.006681287, 15))
                Line((3.006681287, 15), (5.893432633, 20))
                Line((5.893432633, 20), (7.577407229, 20))
                Line((7.577407229, 20), (4.690655883, 15))
                ThreePointArc((4.690655883, 15), (4.690655883, 11), (8.154757498, 9))
            make_face()
        extrude(amount=BOSS_EXTRUDE4_DEPTH)


solid = part.part
